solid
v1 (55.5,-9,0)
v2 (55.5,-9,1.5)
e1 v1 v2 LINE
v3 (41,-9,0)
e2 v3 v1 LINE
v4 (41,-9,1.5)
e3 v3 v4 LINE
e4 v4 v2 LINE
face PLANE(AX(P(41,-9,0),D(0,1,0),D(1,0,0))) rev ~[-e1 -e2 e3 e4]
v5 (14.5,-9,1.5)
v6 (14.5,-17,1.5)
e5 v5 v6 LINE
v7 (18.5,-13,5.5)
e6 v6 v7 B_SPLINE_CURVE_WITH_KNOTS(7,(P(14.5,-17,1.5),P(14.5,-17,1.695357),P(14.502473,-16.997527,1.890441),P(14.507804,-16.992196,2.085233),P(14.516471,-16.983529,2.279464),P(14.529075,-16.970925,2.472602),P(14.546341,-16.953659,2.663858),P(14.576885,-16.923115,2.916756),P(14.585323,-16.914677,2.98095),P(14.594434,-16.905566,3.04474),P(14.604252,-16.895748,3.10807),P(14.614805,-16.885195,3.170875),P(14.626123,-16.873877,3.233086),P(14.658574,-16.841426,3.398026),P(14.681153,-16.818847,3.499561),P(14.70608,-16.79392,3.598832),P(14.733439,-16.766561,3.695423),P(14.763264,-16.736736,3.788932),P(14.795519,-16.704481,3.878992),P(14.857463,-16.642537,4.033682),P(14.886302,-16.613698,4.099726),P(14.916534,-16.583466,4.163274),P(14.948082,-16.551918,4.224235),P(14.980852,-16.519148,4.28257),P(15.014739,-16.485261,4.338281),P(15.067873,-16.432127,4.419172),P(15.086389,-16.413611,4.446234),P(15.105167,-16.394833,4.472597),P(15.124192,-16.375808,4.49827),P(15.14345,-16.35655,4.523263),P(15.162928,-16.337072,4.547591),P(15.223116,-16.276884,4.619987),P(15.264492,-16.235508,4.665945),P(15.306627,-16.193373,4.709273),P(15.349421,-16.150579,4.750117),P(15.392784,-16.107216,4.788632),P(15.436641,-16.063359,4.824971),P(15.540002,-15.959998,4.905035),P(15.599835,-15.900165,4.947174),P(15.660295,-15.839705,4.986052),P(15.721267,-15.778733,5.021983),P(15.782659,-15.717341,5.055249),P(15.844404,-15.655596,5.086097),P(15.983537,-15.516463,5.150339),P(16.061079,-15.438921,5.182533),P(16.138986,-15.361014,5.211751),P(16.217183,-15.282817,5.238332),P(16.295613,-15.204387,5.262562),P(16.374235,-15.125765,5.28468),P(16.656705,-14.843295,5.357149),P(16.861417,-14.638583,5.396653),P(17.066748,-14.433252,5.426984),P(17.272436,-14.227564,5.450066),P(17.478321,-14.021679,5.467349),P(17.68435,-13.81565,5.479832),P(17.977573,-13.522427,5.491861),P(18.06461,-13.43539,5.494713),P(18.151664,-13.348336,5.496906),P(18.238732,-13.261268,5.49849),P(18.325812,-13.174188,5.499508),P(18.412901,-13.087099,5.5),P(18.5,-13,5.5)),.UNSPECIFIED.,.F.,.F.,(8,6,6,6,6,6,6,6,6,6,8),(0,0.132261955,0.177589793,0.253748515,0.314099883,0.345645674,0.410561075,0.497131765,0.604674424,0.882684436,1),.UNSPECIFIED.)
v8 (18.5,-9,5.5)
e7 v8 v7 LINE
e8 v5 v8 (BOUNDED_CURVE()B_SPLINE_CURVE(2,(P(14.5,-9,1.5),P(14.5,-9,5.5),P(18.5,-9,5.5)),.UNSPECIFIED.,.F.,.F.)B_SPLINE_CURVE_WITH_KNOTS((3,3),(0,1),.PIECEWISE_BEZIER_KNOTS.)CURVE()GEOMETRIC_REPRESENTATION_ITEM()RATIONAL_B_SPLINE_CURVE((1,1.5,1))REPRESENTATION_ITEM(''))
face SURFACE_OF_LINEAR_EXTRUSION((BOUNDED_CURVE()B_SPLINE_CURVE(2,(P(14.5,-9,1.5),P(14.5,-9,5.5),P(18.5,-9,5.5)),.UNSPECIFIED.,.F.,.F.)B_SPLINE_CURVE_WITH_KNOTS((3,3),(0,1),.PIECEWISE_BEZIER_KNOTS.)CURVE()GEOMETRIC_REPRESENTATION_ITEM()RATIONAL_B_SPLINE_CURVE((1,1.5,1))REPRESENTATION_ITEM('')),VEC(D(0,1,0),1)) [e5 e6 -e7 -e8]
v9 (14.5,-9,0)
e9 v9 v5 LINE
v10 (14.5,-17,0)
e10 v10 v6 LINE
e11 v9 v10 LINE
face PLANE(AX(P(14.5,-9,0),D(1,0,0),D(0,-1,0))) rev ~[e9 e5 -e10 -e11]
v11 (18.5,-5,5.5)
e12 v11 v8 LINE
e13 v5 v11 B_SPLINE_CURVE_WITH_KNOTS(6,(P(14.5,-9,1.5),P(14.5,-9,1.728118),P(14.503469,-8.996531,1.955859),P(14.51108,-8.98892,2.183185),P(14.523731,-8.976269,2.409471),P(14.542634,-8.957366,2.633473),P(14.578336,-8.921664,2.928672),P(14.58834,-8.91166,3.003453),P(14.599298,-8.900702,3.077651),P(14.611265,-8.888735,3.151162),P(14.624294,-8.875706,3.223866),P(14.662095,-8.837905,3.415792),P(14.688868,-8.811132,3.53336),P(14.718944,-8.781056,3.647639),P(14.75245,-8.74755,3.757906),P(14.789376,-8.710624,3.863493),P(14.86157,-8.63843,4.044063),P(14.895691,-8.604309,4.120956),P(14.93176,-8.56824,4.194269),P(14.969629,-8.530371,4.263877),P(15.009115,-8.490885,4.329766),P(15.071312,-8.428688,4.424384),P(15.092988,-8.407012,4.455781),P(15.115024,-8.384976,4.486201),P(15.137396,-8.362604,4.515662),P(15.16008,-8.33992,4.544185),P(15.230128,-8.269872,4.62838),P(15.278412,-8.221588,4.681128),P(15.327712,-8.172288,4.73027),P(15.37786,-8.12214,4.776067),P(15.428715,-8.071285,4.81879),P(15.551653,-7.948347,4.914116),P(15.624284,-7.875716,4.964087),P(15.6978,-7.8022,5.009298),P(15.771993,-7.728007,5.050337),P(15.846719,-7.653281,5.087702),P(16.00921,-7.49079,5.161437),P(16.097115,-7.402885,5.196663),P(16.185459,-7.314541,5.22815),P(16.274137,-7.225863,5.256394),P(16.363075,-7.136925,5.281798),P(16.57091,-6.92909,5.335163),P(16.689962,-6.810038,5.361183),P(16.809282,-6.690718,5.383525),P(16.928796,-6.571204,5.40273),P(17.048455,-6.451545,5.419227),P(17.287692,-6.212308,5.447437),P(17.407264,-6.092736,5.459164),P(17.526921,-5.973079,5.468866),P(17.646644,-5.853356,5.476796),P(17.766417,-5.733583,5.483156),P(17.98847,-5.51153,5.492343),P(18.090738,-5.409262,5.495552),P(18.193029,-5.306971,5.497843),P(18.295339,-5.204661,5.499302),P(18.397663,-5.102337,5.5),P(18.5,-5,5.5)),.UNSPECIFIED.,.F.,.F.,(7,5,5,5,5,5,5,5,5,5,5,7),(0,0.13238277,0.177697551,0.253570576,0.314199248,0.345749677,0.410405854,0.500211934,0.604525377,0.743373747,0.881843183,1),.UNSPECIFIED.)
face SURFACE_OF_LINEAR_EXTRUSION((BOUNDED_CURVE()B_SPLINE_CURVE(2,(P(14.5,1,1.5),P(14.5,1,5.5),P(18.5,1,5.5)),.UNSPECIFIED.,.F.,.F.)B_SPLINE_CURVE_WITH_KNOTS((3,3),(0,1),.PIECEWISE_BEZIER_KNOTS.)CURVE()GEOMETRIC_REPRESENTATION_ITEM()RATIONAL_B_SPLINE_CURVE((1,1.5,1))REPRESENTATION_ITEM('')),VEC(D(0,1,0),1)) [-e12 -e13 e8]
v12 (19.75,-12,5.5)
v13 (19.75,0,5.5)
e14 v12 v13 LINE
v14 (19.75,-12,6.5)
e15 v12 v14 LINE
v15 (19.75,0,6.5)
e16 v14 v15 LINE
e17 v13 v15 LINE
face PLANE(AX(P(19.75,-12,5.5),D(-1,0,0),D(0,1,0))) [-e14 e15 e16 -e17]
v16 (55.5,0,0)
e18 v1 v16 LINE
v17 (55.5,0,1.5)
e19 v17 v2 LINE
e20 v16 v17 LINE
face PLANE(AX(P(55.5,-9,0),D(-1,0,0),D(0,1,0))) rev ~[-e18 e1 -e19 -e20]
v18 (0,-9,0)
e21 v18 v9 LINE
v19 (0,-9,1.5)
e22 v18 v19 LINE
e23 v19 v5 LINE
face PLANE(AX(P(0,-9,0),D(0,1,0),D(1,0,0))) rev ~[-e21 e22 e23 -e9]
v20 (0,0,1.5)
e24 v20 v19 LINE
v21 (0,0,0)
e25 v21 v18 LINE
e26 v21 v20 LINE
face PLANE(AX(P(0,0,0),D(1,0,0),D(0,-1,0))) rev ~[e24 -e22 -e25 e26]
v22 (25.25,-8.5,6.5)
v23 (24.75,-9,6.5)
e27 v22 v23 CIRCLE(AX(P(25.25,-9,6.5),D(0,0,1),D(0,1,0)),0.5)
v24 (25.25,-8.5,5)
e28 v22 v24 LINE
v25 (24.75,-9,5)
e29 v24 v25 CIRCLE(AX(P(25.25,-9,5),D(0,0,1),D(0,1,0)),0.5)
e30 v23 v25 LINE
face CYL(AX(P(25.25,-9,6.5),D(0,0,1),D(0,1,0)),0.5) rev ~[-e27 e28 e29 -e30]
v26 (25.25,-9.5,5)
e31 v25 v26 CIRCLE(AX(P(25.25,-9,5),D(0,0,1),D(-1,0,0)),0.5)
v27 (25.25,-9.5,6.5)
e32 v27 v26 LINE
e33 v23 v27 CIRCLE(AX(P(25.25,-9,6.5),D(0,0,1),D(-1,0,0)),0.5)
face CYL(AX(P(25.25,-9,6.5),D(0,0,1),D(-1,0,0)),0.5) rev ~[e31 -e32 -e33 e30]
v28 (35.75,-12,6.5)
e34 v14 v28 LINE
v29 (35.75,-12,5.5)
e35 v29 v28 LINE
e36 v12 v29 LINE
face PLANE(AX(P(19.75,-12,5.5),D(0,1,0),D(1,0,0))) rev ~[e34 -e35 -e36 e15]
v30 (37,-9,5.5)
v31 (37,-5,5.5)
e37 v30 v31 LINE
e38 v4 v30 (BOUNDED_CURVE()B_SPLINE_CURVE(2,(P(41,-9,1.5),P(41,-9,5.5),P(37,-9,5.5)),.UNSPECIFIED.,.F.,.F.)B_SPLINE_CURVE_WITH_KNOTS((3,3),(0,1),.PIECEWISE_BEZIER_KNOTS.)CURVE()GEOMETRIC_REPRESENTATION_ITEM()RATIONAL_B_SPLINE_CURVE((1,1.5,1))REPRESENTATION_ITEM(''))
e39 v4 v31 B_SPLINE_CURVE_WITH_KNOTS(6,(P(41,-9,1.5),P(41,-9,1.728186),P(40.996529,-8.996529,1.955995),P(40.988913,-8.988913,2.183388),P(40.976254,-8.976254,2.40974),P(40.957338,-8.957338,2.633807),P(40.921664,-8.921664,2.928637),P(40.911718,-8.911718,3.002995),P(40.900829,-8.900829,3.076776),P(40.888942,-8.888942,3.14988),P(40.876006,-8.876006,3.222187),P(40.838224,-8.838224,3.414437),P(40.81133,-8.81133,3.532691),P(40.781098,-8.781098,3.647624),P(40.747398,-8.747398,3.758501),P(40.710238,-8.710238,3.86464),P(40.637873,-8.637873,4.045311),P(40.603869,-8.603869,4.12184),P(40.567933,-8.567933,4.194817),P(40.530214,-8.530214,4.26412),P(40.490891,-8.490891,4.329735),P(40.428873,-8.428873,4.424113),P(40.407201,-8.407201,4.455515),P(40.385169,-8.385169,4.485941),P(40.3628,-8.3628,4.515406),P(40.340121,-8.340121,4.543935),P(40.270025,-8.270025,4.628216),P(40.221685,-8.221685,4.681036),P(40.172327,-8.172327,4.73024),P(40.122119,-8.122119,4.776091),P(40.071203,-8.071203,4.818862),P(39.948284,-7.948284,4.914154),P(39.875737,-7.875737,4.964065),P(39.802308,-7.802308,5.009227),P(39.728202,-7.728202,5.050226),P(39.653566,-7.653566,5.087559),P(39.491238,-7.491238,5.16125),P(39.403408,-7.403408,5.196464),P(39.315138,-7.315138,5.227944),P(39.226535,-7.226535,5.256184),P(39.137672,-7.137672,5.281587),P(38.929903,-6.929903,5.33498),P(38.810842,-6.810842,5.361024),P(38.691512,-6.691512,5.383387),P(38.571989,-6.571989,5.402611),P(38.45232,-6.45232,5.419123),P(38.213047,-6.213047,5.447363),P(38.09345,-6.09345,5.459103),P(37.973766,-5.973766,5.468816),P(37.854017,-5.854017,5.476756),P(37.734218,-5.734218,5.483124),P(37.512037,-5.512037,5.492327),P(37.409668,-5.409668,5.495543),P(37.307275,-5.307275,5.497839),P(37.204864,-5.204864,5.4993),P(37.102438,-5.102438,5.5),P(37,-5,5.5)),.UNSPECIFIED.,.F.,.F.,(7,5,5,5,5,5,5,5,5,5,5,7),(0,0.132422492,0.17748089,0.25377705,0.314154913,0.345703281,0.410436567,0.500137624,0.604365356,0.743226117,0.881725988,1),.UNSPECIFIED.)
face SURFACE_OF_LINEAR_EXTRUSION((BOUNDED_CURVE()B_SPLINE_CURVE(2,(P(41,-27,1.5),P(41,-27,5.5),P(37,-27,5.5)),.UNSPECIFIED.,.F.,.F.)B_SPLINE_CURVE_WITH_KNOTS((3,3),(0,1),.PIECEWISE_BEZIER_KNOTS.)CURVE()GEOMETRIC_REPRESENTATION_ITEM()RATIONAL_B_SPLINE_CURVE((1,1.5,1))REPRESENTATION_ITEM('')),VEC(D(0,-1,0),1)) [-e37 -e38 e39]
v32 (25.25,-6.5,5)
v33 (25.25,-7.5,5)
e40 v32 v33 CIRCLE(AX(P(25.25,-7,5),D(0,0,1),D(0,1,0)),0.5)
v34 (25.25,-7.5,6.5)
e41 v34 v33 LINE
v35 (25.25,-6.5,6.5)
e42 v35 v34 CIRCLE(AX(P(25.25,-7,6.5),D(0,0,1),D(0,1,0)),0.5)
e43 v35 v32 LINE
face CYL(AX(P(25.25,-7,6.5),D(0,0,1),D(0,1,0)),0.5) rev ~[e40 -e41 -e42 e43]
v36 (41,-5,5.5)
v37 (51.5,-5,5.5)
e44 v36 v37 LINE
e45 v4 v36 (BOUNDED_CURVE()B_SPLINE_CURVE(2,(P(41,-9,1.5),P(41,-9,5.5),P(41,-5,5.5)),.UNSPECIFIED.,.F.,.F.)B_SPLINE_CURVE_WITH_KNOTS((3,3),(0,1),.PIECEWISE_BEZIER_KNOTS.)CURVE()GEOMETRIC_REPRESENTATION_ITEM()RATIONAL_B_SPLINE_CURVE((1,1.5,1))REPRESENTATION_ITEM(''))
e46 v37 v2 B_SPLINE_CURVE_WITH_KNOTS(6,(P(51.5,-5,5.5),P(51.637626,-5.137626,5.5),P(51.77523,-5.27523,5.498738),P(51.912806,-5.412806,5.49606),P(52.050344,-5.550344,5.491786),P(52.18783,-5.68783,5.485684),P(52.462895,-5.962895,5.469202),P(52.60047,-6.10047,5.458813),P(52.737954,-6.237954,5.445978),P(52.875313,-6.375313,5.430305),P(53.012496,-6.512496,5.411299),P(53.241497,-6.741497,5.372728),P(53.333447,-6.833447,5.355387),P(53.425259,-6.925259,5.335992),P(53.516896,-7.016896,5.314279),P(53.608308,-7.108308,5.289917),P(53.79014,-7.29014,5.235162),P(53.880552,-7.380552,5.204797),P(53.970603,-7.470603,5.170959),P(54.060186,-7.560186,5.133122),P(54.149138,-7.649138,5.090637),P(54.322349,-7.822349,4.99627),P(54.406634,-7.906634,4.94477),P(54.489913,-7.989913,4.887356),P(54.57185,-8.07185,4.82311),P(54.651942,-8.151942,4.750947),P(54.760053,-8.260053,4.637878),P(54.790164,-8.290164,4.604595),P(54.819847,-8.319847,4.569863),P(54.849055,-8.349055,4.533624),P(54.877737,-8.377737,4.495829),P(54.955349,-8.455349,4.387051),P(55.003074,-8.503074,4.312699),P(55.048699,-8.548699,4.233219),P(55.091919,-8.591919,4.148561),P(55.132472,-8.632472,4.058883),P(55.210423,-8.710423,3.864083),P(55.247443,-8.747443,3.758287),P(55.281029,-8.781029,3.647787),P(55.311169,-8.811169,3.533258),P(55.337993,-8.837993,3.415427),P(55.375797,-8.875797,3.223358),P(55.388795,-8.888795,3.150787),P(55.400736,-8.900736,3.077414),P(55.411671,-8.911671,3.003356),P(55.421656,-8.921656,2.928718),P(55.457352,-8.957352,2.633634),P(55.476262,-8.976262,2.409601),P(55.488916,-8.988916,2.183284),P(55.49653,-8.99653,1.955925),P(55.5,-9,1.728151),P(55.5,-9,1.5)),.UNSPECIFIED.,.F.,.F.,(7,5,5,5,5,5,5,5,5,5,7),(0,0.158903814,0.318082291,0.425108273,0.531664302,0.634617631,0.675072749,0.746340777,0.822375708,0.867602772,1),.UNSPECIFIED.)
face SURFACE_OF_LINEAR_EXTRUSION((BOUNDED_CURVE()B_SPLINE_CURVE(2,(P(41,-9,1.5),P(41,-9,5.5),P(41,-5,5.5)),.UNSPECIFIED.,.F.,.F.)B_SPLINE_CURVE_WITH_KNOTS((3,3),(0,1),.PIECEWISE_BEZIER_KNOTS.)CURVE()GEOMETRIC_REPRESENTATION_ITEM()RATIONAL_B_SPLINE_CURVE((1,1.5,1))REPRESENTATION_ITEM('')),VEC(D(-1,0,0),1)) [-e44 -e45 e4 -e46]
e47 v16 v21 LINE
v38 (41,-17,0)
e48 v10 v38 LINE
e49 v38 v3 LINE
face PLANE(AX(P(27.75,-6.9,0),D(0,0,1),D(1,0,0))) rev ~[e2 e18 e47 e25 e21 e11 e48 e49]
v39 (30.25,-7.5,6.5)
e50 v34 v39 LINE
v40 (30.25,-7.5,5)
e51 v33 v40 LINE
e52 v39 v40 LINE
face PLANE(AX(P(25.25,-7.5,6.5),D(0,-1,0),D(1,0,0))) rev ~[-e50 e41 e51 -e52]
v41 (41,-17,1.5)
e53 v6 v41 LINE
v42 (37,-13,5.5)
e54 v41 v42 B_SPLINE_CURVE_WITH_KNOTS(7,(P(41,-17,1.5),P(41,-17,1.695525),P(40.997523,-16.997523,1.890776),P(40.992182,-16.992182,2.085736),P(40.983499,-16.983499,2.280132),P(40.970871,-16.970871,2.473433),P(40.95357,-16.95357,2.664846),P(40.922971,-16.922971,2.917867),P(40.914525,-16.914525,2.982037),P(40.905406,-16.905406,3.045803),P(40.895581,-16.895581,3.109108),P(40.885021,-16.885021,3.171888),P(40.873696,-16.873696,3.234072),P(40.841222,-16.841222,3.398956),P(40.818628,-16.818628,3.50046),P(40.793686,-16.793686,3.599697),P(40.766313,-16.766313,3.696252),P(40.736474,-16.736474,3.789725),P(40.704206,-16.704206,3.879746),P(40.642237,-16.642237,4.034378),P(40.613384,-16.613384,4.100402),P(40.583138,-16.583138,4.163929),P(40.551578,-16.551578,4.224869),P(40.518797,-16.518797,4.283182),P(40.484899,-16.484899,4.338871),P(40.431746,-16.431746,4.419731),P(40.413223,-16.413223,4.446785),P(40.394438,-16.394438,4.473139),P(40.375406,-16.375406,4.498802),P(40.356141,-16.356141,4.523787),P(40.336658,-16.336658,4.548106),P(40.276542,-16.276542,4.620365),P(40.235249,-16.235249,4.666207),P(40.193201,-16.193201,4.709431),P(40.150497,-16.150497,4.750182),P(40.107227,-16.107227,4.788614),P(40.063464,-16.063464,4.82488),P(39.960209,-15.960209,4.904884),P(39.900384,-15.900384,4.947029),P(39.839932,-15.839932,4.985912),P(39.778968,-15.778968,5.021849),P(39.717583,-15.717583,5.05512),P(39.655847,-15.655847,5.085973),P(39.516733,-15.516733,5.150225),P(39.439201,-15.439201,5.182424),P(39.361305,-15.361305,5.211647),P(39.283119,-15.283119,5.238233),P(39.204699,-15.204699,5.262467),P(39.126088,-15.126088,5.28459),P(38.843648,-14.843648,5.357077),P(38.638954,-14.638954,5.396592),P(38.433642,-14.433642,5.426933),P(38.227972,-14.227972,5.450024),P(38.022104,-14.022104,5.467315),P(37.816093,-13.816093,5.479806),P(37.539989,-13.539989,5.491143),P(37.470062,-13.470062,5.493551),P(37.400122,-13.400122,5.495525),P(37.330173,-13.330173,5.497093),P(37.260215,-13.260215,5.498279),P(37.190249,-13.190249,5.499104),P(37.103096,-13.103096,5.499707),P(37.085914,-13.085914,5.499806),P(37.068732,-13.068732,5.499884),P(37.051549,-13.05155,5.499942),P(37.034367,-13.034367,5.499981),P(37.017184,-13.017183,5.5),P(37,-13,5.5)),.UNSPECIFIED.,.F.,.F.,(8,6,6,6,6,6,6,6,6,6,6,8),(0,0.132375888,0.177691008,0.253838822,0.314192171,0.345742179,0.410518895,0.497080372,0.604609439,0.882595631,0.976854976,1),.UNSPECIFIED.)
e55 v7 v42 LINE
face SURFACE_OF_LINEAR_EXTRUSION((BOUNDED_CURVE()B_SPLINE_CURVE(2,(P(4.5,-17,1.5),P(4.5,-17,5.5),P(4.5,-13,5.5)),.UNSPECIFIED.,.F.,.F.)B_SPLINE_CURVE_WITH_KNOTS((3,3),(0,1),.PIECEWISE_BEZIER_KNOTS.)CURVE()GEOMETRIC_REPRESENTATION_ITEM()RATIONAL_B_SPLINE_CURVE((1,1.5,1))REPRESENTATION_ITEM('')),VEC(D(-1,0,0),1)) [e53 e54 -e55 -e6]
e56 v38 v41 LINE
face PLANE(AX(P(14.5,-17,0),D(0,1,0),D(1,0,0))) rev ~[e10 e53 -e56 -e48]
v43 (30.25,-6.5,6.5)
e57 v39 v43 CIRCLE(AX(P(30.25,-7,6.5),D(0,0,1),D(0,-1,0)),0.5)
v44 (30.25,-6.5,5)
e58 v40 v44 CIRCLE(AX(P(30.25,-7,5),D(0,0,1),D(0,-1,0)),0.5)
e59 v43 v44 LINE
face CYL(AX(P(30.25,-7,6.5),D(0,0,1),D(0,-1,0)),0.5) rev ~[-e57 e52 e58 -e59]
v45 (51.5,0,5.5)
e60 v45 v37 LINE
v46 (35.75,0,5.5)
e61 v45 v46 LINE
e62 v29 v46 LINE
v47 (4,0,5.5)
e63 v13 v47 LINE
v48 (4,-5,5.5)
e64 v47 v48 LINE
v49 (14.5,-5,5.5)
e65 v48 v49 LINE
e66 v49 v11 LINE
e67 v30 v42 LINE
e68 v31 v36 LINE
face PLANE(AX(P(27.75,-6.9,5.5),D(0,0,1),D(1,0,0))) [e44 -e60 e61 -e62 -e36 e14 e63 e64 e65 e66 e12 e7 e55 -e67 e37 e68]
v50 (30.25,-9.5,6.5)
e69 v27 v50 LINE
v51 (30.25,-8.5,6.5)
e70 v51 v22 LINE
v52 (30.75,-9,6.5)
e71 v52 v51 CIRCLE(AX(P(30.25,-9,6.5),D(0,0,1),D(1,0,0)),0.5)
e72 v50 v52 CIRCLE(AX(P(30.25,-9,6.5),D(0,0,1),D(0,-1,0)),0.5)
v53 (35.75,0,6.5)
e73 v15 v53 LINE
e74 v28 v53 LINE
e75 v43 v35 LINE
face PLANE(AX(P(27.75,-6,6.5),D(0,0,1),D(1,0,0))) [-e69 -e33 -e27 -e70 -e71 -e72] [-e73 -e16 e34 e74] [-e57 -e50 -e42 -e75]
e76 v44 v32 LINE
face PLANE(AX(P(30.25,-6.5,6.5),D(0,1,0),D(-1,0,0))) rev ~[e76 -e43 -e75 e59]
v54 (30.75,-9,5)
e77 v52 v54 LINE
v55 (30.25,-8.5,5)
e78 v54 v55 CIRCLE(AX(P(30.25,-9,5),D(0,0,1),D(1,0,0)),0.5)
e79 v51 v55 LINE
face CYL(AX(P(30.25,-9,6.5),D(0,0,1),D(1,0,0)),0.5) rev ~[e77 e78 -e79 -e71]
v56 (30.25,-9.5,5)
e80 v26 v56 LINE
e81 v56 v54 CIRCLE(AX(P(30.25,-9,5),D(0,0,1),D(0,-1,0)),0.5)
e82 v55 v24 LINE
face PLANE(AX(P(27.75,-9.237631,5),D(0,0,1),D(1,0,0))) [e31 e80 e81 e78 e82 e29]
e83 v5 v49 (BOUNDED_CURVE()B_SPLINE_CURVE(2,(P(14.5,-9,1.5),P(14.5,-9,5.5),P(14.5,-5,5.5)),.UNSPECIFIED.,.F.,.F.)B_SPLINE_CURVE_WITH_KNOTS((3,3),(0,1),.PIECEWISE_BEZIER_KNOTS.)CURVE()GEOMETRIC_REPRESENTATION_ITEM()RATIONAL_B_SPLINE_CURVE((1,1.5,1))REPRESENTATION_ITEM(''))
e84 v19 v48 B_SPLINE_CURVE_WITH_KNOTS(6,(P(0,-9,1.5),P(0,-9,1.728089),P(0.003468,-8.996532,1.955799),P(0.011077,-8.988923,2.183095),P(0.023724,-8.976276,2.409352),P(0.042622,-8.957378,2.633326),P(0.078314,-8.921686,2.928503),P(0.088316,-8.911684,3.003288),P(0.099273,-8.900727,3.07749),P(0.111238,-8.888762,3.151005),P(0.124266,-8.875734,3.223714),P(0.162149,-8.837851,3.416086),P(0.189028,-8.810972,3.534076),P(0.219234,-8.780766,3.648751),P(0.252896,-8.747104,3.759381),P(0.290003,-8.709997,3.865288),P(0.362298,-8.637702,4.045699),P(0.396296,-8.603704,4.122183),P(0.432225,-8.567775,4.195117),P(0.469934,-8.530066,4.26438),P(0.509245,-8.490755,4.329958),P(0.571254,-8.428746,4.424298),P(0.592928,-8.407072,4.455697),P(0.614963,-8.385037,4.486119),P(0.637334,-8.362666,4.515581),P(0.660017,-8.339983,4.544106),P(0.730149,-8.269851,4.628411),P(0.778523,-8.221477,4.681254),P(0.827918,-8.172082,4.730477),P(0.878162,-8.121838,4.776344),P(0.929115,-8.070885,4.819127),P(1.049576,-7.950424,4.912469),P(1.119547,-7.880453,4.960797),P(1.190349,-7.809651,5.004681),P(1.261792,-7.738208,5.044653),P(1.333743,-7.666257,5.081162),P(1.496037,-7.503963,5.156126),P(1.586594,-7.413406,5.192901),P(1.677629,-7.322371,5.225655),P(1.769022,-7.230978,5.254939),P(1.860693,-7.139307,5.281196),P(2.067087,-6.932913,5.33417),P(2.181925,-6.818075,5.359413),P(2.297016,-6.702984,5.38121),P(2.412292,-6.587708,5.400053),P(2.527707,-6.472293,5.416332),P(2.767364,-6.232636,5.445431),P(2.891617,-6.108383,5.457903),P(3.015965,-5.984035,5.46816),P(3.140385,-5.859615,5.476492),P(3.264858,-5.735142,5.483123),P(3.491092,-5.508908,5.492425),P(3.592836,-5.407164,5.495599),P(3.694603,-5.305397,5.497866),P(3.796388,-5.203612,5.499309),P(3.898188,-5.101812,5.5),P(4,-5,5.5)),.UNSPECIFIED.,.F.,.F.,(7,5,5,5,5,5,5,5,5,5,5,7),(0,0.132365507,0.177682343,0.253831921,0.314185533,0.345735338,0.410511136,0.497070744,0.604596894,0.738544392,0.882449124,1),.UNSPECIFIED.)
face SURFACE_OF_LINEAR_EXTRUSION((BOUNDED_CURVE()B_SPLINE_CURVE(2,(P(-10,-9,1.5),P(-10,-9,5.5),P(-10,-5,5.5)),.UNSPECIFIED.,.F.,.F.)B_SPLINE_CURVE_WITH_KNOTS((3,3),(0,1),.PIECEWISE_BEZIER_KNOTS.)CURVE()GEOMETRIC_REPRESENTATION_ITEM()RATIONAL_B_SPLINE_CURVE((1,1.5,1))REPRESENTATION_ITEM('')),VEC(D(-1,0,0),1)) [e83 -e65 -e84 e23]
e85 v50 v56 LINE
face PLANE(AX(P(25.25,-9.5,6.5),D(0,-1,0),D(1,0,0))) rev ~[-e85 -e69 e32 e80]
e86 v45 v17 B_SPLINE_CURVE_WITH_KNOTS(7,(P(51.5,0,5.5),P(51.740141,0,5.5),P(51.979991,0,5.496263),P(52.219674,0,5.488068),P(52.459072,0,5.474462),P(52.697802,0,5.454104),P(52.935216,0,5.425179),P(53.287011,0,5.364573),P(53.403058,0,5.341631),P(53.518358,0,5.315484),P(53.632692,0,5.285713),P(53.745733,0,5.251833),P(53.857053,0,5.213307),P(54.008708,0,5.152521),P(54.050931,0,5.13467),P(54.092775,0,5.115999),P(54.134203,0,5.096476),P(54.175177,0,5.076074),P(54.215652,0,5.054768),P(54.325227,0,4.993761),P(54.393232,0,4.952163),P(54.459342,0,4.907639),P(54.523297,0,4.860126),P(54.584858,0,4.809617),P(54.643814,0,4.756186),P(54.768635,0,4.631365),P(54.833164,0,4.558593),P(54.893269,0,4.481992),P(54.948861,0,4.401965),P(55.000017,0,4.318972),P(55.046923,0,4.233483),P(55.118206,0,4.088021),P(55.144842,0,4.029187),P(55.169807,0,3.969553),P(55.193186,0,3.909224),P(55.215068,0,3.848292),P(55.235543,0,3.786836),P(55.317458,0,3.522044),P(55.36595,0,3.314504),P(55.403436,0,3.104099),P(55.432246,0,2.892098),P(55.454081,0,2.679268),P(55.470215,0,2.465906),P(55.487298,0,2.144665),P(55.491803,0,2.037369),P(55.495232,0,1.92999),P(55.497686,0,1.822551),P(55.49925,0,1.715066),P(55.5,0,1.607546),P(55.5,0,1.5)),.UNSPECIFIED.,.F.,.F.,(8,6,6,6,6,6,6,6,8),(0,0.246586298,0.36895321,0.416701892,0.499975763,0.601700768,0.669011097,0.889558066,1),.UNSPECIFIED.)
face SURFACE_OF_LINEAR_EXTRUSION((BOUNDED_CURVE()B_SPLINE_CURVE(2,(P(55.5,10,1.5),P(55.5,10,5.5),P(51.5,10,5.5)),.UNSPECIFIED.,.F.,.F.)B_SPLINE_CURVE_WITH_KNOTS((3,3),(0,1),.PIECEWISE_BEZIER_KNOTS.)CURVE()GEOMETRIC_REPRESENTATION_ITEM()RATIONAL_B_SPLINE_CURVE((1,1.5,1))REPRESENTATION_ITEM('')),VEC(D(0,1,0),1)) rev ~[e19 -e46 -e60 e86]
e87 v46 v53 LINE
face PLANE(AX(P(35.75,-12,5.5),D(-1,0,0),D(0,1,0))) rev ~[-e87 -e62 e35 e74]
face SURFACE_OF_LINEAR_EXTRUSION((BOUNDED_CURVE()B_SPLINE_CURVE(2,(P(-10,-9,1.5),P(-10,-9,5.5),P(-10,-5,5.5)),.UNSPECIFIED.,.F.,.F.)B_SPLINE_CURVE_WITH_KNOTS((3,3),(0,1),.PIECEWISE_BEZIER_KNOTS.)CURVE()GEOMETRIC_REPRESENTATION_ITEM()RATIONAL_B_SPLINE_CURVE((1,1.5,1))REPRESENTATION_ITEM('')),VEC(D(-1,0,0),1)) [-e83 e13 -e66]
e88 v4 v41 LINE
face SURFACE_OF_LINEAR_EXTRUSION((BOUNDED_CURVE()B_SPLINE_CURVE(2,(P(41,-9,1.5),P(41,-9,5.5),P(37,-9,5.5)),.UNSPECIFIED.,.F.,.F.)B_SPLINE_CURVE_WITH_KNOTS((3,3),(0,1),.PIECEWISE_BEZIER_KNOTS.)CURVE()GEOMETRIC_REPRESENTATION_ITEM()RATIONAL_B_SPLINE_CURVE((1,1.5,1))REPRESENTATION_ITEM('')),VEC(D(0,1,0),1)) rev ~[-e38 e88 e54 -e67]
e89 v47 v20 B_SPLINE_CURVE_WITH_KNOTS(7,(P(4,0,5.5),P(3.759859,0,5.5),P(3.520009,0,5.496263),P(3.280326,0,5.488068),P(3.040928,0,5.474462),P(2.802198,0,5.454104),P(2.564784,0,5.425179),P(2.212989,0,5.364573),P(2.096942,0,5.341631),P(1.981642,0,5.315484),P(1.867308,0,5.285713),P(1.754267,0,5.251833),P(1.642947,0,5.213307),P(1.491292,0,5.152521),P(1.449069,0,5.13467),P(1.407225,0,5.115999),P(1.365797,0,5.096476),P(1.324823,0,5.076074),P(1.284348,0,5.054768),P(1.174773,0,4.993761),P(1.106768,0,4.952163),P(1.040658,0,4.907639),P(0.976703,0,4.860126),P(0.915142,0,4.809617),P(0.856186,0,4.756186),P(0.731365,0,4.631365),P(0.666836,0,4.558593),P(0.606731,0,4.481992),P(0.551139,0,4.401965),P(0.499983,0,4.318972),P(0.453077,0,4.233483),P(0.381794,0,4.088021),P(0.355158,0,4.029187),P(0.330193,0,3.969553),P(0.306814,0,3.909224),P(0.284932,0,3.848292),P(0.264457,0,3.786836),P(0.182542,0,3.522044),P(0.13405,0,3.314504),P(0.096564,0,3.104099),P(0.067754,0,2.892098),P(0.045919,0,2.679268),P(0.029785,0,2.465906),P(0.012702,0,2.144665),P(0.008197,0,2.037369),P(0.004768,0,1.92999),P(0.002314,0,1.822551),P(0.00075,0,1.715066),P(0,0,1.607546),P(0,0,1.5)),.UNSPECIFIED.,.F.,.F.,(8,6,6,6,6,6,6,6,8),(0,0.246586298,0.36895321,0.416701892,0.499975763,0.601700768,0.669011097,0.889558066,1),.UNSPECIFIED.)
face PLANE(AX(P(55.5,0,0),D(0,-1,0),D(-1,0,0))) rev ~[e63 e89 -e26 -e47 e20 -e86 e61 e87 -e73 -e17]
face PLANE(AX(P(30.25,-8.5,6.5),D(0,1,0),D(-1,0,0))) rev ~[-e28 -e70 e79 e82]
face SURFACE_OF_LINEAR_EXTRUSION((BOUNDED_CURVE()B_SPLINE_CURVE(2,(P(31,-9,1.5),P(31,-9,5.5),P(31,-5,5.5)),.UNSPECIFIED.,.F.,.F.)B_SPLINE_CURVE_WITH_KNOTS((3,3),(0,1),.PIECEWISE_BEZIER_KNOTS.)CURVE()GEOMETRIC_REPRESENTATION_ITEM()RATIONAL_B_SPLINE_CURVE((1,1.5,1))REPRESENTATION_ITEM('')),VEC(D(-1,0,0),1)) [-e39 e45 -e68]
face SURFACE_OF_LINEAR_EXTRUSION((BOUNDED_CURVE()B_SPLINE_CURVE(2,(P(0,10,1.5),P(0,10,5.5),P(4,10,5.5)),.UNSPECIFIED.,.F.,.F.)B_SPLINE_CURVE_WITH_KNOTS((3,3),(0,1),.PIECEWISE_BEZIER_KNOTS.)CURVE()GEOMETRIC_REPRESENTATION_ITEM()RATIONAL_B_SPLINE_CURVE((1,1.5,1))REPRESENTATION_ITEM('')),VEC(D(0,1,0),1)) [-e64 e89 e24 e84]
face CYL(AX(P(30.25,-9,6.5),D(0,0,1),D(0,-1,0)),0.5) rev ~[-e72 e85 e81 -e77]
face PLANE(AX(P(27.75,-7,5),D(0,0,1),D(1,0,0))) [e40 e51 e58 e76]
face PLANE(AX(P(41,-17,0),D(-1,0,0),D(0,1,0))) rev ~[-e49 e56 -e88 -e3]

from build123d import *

# Parameters (mm, degrees)
F1_DEPTH     = 5.5
F2_T1_DEPTH  = 24.5
F2_T3_DEPTH  = 29
F2_T5_DEPTH  = 46.5
F2_T7_DEPTH  = 18
F2_T9_DEPTH  = 24.5
F2_T15_DEPTH = 34.5
F2_T19_DEPTH = 28
F2_T26_DEPTH = 28
F2_T30_DEPTH = 34.5
F3_W         = 16
F3_H         = 12
F4_DEPTH     = 1
F6_DEPTH     = 1.5


# Not quite as in the source:
# - a fillet or chamfer that OpenCascade refuses, or shapes differently, is made with other operations: its cross-section is extruded or revolved along the edge and cut away or added


with BuildPart() as f1:
    # F0 (on Top) → F1 (new body)
    with BuildSketch(Plane.XY):
        Polygon((55.5, 0), (0, 0), (0, -9), (14.5, -9), (14.5, -17), (41, -17), (41, -9), (55.5, -9), align=None)
    extrude(amount=F1_DEPTH)

    # F2: fillet of radius 4 on 7 edges, made by hand

    # F2_s2 → F2_t1 (cut)
    with BuildSketch(Plane.YZ.offset(-10)):
        with BuildLine():
            add(Edge.make_bspline(
                [(-9, 1.5), (-9, 5.5), (-5, 5.5)],
                knots=[0, 0, 0, 1, 1, 1], degree=2, weights=[1, 1.5, 1]))
            Line((-5, 5.5), (-9, 5.5))
            Line((-9, 5.5), (-9, 1.5))
        make_face()
    extrude(amount=F2_T1_DEPTH, mode=Mode.SUBTRACT)

    # F2_s4 → F2_t3 (cut)
    with BuildSketch(Plane.XZ.offset(-10)):
        with BuildLine():
            add(Edge.make_bspline(
                [(0, 1.5), (0, 5.5), (4, 5.5)],
                knots=[0, 0, 0, 1, 1, 1], degree=2, weights=[1, 1.5, 1]))
            Line((4, 5.5), (0, 5.5))
            Line((0, 5.5), (0, 1.5))
        make_face()
        with BuildLine():
            add(Edge.make_bspline(
                [(55.5, 1.5), (55.5, 5.5), (51.5, 5.5)],
                knots=[0, 0, 0, 1, 1, 1], degree=2, weights=[1, 1.5, 1]))
            Line((51.5, 5.5), (55.5, 5.5))
            Line((55.5, 5.5), (55.5, 1.5))
        make_face()
    extrude(amount=F2_T3_DEPTH, mode=Mode.SUBTRACT)

    # F2_s6 → F2_t5 (cut)
    with BuildSketch(Plane.YZ.offset(4.5)):
        with BuildLine():
            add(Edge.make_bspline(
                [(-17, 1.5), (-17, 5.5), (-13, 5.5)],
                knots=[0, 0, 0, 1, 1, 1], degree=2, weights=[1, 1.5, 1]))
            Line((-13, 5.5), (-17, 5.5))
            Line((-17, 5.5), (-17, 1.5))
        make_face()
    extrude(amount=F2_T5_DEPTH, mode=Mode.SUBTRACT)

    # F2_s8 → F2_t7 (cut)
    with BuildSketch(Plane.XZ.offset(9)):
        with BuildLine():
            add(Edge.make_bspline(
                [(41, 1.5), (41, 5.5), (37, 5.5)],
                knots=[0, 0, 0, 1, 1, 1], degree=2, weights=[1, 1.5, 1]))
            Line((37, 5.5), (41, 5.5))
            Line((41, 5.5), (41, 1.5))
        make_face()
        with BuildLine():
            add(Edge.make_bspline(
                [(14.5, 1.5), (14.5, 5.5), (18.5, 5.5)],
                knots=[0, 0, 0, 1, 1, 1], degree=2, weights=[1, 1.5, 1]))
            Line((18.5, 5.5), (14.5, 5.5))
            Line((14.5, 5.5), (14.5, 1.5))
        make_face()
    extrude(amount=F2_T7_DEPTH, mode=Mode.SUBTRACT)

    # F2_s10 → F2_t9 (cut)
    with BuildSketch(Plane.YZ.offset(41)):
        with BuildLine():
            add(Edge.make_bspline(
                [(-9, 1.5), (-9, 5.5), (-5, 5.5)],
                knots=[0, 0, 0, 1, 1, 1], degree=2, weights=[1, 1.5, 1]))
            Line((-5, 5.5), (-9, 5.5))
            Line((-9, 5.5), (-9, 1.5))
        make_face()
    extrude(amount=F2_T9_DEPTH, mode=Mode.SUBTRACT)


with BuildPart() as f2_tool13:
    # F2_s14 → F2_t15 (new body)
    with BuildSketch(Plane.YZ.offset(-10)):
        with BuildLine():
            add(Edge.make_bspline(
                [(-9, 1.5), (-9, 5.5), (-5, 5.5)],
                knots=[0, 0, 0, 1, 1, 1], degree=2, weights=[1, 1.5, 1]))
            Line((-5, 5.5), (-9, 5.5))
            Line((-9, 5.5), (-9, 1.5))
        make_face()
    extrude(amount=F2_T15_DEPTH)

    split(bisect_by=Plane.YZ.offset(14.5), keep=Keep.TOP)


with BuildPart() as f2_tool17:
    # F2_s18 → F2_t19 (new body)
    with BuildSketch(Plane.XZ.offset(-1)):
        with BuildLine():
            add(Edge.make_bspline(
                [(14.5, 1.5), (14.5, 5.5), (18.5, 5.5)],
                knots=[0, 0, 0, 1, 1, 1], degree=2, weights=[1, 1.5, 1]))
            Line((18.5, 5.5), (14.5, 5.5))
            Line((14.5, 5.5), (14.5, 1.5))
        make_face()
    extrude(amount=F2_T19_DEPTH)

    split(bisect_by=Plane.XZ.offset(9), keep=Keep.BOTTOM)


with BuildPart() as f2_tool13_1:
    add(f2_tool13.part)

    # F2_t21: intersect F2_tool17
    add(f2_tool17.part, mode=Mode.INTERSECT)


with BuildPart() as f1_1:
    add(f1.part)

    # F2_t11: cut F2_tool13
    add(f2_tool13_1.part, mode=Mode.SUBTRACT)


with BuildPart() as f2_tool24:
    # F2_s25 → F2_t26 (new body)
    with BuildSketch(Plane.XZ.offset(27)):
        with BuildLine():
            add(Edge.make_bspline(
                [(41, 1.5), (41, 5.5), (37, 5.5)],
                knots=[0, 0, 0, 1, 1, 1], degree=2, weights=[1, 1.5, 1]))
            Line((37, 5.5), (41, 5.5))
            Line((41, 5.5), (41, 1.5))
        make_face()
    extrude(amount=-F2_T26_DEPTH)

    split(bisect_by=Plane.XZ.offset(9), keep=Keep.BOTTOM)


with BuildPart() as f2_tool28:
    # F2_s29 → F2_t30 (new body)
    with BuildSketch(Plane.YZ.offset(31)):
        with BuildLine():
            add(Edge.make_bspline(
                [(-9, 1.5), (-9, 5.5), (-5, 5.5)],
                knots=[0, 0, 0, 1, 1, 1], degree=2, weights=[1, 1.5, 1]))
            Line((-5, 5.5), (-9, 5.5))
            Line((-9, 5.5), (-9, 1.5))
        make_face()
    extrude(amount=F2_T30_DEPTH)

    split(bisect_by=Plane.YZ.offset(41), keep=Keep.BOTTOM)


with BuildPart() as f2_tool24_1:
    add(f2_tool24.part)

    # F2_t32: intersect F2_tool28
    add(f2_tool28.part, mode=Mode.INTERSECT)


with BuildPart() as f1_2:
    add(f1_1.part)

    # F2_t22: cut F2_tool24
    add(f2_tool24_1.part, mode=Mode.SUBTRACT)

    # F3 (on face) → F4 (join)
    with BuildSketch(Plane.XY.offset(5.5)):
        with Locations((27.75, -6)):
            Rectangle(F3_W, F3_H)
    extrude(amount=F4_DEPTH)

    # F5 (on face) → F6 (cut)
    with BuildSketch(Plane.XY.offset(6.5)):
        with BuildLine():
            ThreePointArc((25.25, -6.5), (24.75, -7), (25.25, -7.5))
            Line((25.25, -7.5), (30.25, -7.5))
            ThreePointArc((30.25, -7.5), (30.75, -7), (30.25, -6.5))
            Line((30.25, -6.5), (25.25, -6.5))
        make_face()
        with BuildLine():
            Line((30.25, -9), (25.25, -9))
            Line((25.25, -9), (24.75, -9))
            ThreePointArc((24.75, -9), (24.8964466094, -9.3535533906), (25.25, -9.5))
            Line((25.25, -9.5), (30.25, -9.5))
            ThreePointArc((30.25, -9.5), (30.6035533906, -9.3535533906), (30.75, -9))
            Line((30.75, -9), (30.25, -9))
        make_face()
        with BuildLine():
            Line((24.75, -9), (25.25, -9))
            Line((25.25, -9), (30.25, -9))
            Line((30.25, -9), (30.75, -9))
            ThreePointArc((30.75, -9), (30.6035533906, -8.6464466094), (30.25, -8.5))
            Line((30.25, -8.5), (25.25, -8.5))
            ThreePointArc((25.25, -8.5), (24.8964466094, -8.6464466094), (24.75, -9))
        make_face()
    extrude(amount=-F6_DEPTH, mode=Mode.SUBTRACT)


solid = f1_2.part
